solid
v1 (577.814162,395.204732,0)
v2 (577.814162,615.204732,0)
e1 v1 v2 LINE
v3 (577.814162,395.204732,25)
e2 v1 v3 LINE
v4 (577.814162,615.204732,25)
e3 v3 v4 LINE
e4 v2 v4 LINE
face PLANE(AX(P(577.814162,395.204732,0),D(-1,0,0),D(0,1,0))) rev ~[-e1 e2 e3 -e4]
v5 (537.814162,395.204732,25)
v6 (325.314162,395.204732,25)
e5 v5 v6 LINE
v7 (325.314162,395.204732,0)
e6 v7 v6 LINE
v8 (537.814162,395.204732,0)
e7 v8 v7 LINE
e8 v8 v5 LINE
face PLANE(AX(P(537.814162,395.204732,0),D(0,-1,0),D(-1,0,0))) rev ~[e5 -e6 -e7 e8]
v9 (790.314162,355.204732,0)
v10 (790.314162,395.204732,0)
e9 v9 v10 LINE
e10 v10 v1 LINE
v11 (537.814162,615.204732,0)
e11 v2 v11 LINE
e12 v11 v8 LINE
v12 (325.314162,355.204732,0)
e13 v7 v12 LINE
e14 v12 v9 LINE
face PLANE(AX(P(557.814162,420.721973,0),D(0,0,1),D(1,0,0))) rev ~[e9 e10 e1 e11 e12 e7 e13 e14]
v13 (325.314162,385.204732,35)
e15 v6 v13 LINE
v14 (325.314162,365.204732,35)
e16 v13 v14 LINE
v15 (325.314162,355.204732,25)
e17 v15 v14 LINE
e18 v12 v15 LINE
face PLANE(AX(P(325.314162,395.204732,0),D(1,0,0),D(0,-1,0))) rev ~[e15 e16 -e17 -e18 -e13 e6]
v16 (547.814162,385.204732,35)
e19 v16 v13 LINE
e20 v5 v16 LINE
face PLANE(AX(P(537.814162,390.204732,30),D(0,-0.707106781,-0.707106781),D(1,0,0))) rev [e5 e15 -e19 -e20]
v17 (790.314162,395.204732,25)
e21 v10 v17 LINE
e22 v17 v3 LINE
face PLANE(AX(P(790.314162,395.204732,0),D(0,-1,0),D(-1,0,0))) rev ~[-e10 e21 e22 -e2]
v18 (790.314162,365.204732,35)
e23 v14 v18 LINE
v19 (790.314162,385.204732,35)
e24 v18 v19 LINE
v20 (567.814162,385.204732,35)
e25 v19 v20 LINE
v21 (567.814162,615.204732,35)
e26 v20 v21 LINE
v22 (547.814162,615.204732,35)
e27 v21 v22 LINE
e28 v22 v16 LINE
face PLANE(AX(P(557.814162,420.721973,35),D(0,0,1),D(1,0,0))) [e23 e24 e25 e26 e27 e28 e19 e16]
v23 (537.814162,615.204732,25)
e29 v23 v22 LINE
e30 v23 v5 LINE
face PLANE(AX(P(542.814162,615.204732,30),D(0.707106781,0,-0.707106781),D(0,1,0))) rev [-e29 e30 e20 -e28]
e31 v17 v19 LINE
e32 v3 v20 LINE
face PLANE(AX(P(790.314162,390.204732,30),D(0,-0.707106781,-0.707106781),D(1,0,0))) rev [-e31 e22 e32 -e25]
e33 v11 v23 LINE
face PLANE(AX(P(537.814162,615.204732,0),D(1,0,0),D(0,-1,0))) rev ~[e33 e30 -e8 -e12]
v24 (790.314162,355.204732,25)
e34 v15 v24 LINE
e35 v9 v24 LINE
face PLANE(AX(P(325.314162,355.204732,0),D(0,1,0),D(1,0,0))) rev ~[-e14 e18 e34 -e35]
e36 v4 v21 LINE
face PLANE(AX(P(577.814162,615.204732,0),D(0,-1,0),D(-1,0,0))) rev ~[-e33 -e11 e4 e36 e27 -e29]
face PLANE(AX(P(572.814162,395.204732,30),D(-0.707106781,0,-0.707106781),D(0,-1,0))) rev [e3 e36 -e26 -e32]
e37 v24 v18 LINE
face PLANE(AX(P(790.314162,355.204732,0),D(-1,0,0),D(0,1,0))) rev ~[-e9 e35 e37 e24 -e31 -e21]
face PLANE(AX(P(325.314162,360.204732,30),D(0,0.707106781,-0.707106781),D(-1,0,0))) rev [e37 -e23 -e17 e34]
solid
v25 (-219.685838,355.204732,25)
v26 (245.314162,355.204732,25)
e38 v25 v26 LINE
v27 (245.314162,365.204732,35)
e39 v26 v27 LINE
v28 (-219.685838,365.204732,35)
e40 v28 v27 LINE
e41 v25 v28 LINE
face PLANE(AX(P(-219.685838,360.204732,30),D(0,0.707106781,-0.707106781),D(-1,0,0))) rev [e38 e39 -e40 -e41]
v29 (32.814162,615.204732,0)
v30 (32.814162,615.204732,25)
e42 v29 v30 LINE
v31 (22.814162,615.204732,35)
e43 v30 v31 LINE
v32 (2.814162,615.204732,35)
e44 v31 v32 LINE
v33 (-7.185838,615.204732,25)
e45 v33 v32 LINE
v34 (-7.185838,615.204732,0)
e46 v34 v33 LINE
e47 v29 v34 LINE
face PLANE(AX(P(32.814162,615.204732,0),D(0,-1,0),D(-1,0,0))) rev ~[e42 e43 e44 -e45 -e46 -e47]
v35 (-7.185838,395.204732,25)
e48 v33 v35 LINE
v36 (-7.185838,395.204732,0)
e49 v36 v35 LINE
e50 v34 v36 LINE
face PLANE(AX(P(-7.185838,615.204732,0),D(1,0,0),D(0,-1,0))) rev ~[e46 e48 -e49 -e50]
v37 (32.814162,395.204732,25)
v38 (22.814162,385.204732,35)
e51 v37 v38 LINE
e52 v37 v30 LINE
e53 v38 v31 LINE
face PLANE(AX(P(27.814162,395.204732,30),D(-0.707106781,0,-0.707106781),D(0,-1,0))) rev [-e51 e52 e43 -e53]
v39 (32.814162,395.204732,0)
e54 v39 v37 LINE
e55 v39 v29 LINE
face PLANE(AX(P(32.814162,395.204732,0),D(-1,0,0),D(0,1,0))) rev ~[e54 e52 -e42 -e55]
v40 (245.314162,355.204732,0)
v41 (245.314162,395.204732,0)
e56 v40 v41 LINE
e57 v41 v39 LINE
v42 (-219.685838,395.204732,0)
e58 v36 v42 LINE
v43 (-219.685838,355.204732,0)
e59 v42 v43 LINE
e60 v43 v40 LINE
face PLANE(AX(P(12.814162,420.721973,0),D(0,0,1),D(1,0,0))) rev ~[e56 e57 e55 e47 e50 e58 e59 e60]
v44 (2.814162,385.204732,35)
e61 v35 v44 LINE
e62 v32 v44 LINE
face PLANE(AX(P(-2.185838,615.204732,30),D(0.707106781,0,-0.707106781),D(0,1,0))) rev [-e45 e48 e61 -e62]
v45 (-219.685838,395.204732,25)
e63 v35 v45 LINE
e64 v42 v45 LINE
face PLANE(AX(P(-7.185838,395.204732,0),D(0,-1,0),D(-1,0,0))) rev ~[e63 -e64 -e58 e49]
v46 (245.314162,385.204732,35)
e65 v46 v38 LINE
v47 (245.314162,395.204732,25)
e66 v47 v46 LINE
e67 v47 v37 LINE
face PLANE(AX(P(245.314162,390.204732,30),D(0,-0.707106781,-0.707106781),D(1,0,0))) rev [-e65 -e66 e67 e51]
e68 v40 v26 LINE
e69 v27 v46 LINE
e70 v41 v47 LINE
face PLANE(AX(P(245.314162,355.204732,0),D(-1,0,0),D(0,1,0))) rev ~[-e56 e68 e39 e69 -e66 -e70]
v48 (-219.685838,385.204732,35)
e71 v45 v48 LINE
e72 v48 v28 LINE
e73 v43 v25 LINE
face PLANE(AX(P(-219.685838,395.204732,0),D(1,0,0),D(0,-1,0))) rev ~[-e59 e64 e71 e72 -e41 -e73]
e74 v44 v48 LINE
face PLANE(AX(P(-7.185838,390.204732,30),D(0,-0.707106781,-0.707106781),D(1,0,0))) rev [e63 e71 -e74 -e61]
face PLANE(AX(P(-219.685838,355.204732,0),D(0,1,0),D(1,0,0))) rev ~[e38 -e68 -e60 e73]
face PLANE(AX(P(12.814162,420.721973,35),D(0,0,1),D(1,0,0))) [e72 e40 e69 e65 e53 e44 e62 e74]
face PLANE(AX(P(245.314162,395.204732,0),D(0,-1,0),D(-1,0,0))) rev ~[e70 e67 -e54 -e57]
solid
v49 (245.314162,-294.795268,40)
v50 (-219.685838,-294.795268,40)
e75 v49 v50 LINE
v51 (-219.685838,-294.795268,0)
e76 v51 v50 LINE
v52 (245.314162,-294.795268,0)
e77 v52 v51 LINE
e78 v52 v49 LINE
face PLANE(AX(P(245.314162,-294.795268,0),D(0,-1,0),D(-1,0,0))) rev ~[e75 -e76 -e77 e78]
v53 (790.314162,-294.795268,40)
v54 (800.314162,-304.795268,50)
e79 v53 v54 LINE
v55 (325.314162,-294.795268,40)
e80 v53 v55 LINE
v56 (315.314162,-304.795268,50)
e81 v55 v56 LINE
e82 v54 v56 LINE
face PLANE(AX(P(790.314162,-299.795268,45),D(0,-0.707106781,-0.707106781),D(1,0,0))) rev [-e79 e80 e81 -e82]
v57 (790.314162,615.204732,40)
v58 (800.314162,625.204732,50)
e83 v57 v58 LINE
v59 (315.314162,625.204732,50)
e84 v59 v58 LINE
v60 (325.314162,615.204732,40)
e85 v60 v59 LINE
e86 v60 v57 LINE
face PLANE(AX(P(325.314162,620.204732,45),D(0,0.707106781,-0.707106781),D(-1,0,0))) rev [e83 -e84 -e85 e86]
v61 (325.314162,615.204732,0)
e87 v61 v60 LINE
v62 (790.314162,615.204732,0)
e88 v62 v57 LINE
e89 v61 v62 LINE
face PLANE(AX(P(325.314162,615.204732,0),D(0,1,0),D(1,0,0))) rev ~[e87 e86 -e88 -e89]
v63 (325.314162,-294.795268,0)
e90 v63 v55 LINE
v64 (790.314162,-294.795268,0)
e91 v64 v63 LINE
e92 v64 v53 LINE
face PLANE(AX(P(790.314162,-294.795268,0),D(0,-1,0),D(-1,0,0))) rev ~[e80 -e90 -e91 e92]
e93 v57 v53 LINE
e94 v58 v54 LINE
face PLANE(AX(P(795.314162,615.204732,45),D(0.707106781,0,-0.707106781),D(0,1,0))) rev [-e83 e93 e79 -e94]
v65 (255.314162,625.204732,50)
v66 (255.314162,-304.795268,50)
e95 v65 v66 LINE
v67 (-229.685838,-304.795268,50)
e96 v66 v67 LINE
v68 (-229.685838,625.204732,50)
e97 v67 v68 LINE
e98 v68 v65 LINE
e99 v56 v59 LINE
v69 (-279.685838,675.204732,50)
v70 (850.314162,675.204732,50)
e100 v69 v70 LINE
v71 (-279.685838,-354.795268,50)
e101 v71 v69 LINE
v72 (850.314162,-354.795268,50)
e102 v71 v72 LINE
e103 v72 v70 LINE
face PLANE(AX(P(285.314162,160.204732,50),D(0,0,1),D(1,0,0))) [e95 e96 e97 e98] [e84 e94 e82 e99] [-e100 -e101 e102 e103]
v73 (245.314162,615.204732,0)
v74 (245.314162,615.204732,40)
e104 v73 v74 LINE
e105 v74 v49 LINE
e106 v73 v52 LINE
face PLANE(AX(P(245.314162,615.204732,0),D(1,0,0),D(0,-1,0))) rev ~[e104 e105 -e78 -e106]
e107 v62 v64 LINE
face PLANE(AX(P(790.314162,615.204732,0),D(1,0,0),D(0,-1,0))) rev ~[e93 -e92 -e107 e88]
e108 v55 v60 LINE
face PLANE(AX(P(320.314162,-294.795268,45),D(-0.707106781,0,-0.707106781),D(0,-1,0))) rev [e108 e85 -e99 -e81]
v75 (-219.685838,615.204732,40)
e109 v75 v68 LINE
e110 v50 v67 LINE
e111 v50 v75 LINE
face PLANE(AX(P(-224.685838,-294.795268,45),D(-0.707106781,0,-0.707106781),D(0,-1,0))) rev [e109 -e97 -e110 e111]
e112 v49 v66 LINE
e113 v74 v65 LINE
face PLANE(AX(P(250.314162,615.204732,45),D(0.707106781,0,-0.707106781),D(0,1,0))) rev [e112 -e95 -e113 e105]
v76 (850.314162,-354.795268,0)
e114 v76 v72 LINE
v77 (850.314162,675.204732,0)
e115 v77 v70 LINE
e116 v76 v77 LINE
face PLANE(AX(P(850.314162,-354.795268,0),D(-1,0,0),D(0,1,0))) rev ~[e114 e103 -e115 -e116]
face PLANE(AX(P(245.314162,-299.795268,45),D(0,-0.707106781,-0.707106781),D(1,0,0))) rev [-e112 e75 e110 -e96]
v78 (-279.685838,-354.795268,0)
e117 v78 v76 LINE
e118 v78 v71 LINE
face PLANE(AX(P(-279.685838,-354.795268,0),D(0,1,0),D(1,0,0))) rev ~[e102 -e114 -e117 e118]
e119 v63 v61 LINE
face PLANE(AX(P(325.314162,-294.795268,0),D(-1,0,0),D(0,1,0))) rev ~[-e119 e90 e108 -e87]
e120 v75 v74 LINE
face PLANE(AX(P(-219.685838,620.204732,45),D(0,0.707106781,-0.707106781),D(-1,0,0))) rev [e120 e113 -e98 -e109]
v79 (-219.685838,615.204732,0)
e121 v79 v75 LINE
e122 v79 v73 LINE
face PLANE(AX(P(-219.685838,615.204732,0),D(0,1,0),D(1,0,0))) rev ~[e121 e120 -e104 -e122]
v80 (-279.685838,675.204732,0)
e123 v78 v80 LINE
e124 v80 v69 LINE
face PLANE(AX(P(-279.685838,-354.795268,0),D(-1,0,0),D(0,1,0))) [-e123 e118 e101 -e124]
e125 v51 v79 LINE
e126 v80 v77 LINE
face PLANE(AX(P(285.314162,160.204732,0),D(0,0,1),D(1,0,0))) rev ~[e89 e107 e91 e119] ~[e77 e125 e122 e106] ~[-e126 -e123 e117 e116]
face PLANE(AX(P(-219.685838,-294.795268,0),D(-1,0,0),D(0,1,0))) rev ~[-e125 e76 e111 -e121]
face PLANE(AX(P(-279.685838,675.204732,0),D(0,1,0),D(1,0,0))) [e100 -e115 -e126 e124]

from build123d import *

# Parameters (mm, degrees)
F0_W      = 1130
F0_H      = 1030
F1_DEPTH  = 50
F2_DEPTH  = 35
F3_SIZE   = 10
F3_2_SIZE = 10
F3_3_SIZE = 10


with BuildPart() as f1:
    # F0 (on Top) → F1 (new body)
    with BuildSketch(Plane.XY):
        with Locations((285.3141621128, 160.2047318473)):
            Rectangle(F0_W, F0_H)
        Polygon((-219.6858378872, -294.7952681527), (-219.6858378872, 355.2047318473), (-219.6858378872, 395.2047318473), (-219.6858378872, 615.2047318473), (-7.1858378872, 615.2047318473), (32.8141621128, 615.2047318473), (245.3141621128, 615.2047318473), (245.3141621128, 395.2047318473), (245.3141621128, 355.2047318473), (245.3141621128, -294.7952681527), align=None, mode=Mode.SUBTRACT)
        Polygon((325.3141621128, -294.7952681527), (325.3141621128, 355.2047318473), (325.3141621128, 395.2047318473), (325.3141621128, 615.2047318473), (537.8141621128, 615.2047318473), (577.8141621128, 615.2047318473), (790.3141621128, 615.2047318473), (790.3141621128, 395.2047318473), (790.3141621128, 355.2047318473), (790.3141621128, -294.7952681527), align=None, mode=Mode.SUBTRACT)
    extrude(amount=F1_DEPTH)

    # F3
    f3_edges = [f1.edges().sort_by_distance(p)[0] for p in [
        (-219.685838, 160.204732, 50),
        (12.814162, 615.204732, 50),
        (245.314162, 160.204732, 50),
        (325.314162, 160.204732, 50),
        (557.814162, 615.204732, 50),
        (790.314162, 160.204732, 50),
        (557.814162, -294.795268, 50),
        (12.814162, -294.795268, 50),
    ]]
    chamfer(f3_edges, length=F3_SIZE)


with BuildPart() as f2:
    # F0 (on Top) → F2 (new body)
    with BuildSketch(Plane.XY):
        Polygon((-219.6858378872, 395.2047318473), (-219.6858378872, 355.2047318473), (245.3141621128, 355.2047318473), (245.3141621128, 395.2047318473), (32.8141621128, 395.2047318473), (32.8141621128, 615.2047318473), (-7.1858378872, 615.2047318473), (-7.1858378872, 395.2047318473), align=None)
    extrude(amount=F2_DEPTH)

    # F3#2
    f3_2_edges = [f2.edges().sort_by_distance(p)[0] for p in [
        (12.814162, 355.204732, 35),
        (139.064162, 395.204732, 35),
        (32.814162, 505.204732, 35),
        (-7.185838, 505.204732, 35),
        (-113.435838, 395.204732, 35),
    ]]
    chamfer(f3_2_edges, length=F3_2_SIZE)


with BuildPart() as f2b:
    # F0 (on Top) → F2, piece 2 (new body)
    with BuildSketch(Plane.XY):
        Polygon((325.3141621128, 395.2047318473), (325.3141621128, 355.2047318473), (790.3141621128, 355.2047318473), (790.3141621128, 395.2047318473), (577.8141621128, 395.2047318473), (577.8141621128, 615.2047318473), (537.8141621128, 615.2047318473), (537.8141621128, 395.2047318473), align=None)
    extrude(amount=F2_DEPTH)

    # F3#3
    f3_3_edges = [f2b.edges().sort_by_distance(p)[0] for p in [
        (557.814162, 355.204732, 35),
        (431.564162, 395.204732, 35),
        (577.814162, 505.204732, 35),
        (684.064162, 395.204732, 35),
        (537.814162, 505.204732, 35),
    ]]
    chamfer(f3_3_edges, length=F3_3_SIZE)


solid = Compound([f1.part, f2.part, f2b.part])
